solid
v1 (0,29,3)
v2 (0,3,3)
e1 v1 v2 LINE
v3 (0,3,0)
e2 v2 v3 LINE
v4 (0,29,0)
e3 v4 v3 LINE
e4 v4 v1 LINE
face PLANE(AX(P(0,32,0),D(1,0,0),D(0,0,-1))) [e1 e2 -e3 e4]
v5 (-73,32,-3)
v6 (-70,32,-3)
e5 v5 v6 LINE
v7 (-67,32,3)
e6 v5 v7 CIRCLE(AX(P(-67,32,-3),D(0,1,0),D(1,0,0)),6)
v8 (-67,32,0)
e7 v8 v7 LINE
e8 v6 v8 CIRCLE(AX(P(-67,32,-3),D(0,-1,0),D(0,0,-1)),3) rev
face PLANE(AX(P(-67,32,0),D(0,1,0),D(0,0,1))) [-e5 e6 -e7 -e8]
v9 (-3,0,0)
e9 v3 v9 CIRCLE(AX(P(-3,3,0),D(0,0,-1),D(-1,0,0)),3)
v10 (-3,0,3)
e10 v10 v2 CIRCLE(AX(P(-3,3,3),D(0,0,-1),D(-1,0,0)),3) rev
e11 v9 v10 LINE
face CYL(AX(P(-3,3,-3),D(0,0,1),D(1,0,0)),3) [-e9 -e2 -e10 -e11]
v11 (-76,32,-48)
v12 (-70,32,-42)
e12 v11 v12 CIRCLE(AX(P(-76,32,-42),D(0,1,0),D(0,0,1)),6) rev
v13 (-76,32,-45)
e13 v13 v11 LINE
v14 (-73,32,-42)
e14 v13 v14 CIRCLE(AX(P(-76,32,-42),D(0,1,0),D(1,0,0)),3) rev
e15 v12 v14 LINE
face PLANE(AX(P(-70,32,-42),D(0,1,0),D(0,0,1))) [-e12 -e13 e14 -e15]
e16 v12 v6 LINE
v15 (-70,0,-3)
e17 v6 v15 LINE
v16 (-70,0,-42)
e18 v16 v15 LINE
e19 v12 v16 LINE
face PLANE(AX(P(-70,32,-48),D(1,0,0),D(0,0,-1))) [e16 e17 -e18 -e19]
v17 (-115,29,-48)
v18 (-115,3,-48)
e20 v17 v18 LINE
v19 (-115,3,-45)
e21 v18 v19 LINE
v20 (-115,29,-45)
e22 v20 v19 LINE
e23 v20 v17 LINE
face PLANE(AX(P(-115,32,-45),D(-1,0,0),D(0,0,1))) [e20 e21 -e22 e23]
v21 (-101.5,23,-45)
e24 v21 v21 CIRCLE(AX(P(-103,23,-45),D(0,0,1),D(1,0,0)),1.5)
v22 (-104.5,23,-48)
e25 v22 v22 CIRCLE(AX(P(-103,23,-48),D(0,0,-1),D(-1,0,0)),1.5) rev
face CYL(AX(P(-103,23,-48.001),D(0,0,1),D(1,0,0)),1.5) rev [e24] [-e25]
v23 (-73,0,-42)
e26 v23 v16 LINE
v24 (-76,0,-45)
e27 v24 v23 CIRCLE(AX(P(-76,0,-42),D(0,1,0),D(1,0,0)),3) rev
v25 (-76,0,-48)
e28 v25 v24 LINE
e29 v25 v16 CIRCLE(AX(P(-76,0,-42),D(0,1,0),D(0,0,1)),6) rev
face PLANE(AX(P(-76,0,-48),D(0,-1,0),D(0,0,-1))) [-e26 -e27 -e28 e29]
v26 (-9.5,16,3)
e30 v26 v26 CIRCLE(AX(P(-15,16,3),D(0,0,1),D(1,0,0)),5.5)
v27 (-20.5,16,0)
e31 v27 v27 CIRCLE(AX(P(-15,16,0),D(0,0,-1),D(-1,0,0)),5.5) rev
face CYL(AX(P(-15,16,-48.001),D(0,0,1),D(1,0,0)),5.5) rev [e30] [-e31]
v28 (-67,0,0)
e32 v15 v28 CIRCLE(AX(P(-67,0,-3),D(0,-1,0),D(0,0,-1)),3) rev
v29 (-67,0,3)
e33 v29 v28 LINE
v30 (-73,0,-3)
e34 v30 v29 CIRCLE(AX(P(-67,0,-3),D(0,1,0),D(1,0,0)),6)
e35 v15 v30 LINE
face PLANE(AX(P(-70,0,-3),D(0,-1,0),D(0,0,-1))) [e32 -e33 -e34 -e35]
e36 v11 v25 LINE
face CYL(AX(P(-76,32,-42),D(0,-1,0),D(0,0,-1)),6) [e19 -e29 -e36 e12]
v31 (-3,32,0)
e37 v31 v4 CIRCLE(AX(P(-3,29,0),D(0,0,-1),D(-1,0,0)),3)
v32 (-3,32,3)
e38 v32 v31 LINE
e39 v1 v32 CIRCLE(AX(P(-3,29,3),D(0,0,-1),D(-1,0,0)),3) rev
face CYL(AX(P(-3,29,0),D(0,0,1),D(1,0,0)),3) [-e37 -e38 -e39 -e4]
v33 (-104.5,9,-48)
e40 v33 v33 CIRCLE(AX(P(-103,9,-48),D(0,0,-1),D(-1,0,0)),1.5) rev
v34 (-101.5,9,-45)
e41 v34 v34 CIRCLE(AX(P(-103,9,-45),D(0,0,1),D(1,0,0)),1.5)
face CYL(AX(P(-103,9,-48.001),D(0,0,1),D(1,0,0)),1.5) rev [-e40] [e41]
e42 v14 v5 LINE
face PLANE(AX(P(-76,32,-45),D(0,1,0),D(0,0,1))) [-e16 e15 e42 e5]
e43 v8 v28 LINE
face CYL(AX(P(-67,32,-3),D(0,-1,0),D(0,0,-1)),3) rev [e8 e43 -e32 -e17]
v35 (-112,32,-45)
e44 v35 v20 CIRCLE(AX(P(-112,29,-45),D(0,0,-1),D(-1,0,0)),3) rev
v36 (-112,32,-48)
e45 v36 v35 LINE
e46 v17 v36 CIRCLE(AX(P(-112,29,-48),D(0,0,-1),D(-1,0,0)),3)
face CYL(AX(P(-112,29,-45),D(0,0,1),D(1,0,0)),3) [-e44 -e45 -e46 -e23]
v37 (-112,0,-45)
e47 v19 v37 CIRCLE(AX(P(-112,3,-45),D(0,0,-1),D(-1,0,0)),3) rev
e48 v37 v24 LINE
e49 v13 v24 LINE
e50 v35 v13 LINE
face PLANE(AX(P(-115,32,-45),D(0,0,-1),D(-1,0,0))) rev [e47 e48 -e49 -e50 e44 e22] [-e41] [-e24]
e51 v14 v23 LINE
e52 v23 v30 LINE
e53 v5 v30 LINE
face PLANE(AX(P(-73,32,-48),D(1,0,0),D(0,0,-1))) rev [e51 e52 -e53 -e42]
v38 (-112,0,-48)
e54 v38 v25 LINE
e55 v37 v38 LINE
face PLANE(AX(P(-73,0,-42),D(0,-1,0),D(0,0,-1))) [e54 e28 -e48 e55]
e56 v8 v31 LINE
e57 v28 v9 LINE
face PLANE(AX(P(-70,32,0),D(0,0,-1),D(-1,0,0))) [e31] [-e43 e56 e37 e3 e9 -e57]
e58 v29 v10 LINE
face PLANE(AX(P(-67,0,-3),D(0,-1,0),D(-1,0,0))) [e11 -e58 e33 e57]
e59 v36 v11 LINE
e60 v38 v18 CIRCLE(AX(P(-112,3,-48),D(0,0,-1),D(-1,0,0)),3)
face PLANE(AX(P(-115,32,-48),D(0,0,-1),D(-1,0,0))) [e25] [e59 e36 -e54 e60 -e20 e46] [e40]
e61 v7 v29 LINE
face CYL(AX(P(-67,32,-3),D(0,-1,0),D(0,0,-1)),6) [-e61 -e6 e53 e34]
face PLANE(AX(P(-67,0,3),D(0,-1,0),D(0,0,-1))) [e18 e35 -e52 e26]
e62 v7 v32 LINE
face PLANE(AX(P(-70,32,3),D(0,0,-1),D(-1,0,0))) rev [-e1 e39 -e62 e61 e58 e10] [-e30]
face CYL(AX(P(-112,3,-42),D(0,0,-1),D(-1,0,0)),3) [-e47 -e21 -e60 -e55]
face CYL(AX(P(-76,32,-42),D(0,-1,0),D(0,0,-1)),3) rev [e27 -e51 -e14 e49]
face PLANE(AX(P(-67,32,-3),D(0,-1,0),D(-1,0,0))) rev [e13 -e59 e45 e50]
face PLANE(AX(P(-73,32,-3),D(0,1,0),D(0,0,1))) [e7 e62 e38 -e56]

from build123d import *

# Parameters (mm, degrees)
BASE_FLANGE1_DEPTH = 32
CUT_EXTRUDE1_REACH = 130.658
SKETCH7_R          = 1.5
CUT_EXTRUDE2_REACH = 131.808
SKETCH8_R          = 5.5
FILLET1_R          = 3


# Sheet-metal steps are written as plain solids
with BuildPart() as part:
    # Sketch2 → Base-Flange1 (new body)
    with BuildSketch(Plane(origin=(0, 0, 0), x_dir=(1, 0, 0), z_dir=(0, 1, 0))):
        with BuildLine():
            Line((-115, 48), (-76, 48))
            ThreePointArc((-76, 48), (-71.757359313, 46.242640687), (-70, 42))
            Line((-70, 42), (-70, 3))
            ThreePointArc((-70, 3), (-69.121320344, 0.878679656), (-67, 0))
            Line((-67, 0), (0, 0))
            Line((0, 0), (0, -3))
            Line((0, -3), (-67, -3))
            ThreePointArc((-67, -3), (-71.242640687, -1.242640687), (-73, 3))
            Line((-73, 3), (-73, 42))
            ThreePointArc((-73, 42), (-73.878679656, 44.121320344), (-76, 45))
            Line((-76, 45), (-115, 45))
            Line((-115, 45), (-115, 48))
        make_face()
    extrude(amount=BASE_FLANGE1_DEPTH)

    # Sketch7 → Cut-Extrude1 (cut, up to next)
    with BuildSketch(Plane.XY.offset(-45), mode=Mode.PRIVATE) as cut_extrude1_sk1:
        with Locations((-103, 23)):
            Circle(SKETCH7_R)
    cut_extrude1_tool1 = extrude(cut_extrude1_sk1.sketch, amount=-CUT_EXTRUDE1_REACH, mode=Mode.PRIVATE) & part.part
    # Sketch7 → Cut-Extrude1 (cut, up to next)
    with BuildSketch(Plane.XY.offset(-45), mode=Mode.PRIVATE) as cut_extrude1_sk2:
        with Locations((-103, 9)):
            Circle(SKETCH7_R)
    cut_extrude1_tool2 = extrude(cut_extrude1_sk2.sketch, amount=-CUT_EXTRUDE1_REACH, mode=Mode.PRIVATE) & part.part
    add(cut_extrude1_tool1.solids().sort_by_distance((-103, 23, -45))[0], mode=Mode.SUBTRACT)
    add(cut_extrude1_tool2.solids().sort_by_distance((-103, 9, -45))[0], mode=Mode.SUBTRACT)

    # Sketch8 → Cut-Extrude2 (cut, up to next)
    with BuildSketch(Plane.XY.offset(3), mode=Mode.PRIVATE) as cut_extrude2_sk1:
        with Locations((-15, 16)):
            Circle(SKETCH8_R)
    cut_extrude2_tool1 = extrude(cut_extrude2_sk1.sketch, amount=-CUT_EXTRUDE2_REACH, mode=Mode.PRIVATE) & part.part
    add(cut_extrude2_tool1.solids().sort_by_distance((-15, 16, 3))[0], mode=Mode.SUBTRACT)

    # Fillet1
    fillet1_edges = [part.edges().sort_by_distance(p)[0] for p in [
        (-115, 0, -46.5),
        (0, 0, 1.5),
        (-115, 32, -46.5),
        (0, 32, 1.5),
    ]]
    fillet(fillet1_edges, radius=FILLET1_R)


solid = part.part
